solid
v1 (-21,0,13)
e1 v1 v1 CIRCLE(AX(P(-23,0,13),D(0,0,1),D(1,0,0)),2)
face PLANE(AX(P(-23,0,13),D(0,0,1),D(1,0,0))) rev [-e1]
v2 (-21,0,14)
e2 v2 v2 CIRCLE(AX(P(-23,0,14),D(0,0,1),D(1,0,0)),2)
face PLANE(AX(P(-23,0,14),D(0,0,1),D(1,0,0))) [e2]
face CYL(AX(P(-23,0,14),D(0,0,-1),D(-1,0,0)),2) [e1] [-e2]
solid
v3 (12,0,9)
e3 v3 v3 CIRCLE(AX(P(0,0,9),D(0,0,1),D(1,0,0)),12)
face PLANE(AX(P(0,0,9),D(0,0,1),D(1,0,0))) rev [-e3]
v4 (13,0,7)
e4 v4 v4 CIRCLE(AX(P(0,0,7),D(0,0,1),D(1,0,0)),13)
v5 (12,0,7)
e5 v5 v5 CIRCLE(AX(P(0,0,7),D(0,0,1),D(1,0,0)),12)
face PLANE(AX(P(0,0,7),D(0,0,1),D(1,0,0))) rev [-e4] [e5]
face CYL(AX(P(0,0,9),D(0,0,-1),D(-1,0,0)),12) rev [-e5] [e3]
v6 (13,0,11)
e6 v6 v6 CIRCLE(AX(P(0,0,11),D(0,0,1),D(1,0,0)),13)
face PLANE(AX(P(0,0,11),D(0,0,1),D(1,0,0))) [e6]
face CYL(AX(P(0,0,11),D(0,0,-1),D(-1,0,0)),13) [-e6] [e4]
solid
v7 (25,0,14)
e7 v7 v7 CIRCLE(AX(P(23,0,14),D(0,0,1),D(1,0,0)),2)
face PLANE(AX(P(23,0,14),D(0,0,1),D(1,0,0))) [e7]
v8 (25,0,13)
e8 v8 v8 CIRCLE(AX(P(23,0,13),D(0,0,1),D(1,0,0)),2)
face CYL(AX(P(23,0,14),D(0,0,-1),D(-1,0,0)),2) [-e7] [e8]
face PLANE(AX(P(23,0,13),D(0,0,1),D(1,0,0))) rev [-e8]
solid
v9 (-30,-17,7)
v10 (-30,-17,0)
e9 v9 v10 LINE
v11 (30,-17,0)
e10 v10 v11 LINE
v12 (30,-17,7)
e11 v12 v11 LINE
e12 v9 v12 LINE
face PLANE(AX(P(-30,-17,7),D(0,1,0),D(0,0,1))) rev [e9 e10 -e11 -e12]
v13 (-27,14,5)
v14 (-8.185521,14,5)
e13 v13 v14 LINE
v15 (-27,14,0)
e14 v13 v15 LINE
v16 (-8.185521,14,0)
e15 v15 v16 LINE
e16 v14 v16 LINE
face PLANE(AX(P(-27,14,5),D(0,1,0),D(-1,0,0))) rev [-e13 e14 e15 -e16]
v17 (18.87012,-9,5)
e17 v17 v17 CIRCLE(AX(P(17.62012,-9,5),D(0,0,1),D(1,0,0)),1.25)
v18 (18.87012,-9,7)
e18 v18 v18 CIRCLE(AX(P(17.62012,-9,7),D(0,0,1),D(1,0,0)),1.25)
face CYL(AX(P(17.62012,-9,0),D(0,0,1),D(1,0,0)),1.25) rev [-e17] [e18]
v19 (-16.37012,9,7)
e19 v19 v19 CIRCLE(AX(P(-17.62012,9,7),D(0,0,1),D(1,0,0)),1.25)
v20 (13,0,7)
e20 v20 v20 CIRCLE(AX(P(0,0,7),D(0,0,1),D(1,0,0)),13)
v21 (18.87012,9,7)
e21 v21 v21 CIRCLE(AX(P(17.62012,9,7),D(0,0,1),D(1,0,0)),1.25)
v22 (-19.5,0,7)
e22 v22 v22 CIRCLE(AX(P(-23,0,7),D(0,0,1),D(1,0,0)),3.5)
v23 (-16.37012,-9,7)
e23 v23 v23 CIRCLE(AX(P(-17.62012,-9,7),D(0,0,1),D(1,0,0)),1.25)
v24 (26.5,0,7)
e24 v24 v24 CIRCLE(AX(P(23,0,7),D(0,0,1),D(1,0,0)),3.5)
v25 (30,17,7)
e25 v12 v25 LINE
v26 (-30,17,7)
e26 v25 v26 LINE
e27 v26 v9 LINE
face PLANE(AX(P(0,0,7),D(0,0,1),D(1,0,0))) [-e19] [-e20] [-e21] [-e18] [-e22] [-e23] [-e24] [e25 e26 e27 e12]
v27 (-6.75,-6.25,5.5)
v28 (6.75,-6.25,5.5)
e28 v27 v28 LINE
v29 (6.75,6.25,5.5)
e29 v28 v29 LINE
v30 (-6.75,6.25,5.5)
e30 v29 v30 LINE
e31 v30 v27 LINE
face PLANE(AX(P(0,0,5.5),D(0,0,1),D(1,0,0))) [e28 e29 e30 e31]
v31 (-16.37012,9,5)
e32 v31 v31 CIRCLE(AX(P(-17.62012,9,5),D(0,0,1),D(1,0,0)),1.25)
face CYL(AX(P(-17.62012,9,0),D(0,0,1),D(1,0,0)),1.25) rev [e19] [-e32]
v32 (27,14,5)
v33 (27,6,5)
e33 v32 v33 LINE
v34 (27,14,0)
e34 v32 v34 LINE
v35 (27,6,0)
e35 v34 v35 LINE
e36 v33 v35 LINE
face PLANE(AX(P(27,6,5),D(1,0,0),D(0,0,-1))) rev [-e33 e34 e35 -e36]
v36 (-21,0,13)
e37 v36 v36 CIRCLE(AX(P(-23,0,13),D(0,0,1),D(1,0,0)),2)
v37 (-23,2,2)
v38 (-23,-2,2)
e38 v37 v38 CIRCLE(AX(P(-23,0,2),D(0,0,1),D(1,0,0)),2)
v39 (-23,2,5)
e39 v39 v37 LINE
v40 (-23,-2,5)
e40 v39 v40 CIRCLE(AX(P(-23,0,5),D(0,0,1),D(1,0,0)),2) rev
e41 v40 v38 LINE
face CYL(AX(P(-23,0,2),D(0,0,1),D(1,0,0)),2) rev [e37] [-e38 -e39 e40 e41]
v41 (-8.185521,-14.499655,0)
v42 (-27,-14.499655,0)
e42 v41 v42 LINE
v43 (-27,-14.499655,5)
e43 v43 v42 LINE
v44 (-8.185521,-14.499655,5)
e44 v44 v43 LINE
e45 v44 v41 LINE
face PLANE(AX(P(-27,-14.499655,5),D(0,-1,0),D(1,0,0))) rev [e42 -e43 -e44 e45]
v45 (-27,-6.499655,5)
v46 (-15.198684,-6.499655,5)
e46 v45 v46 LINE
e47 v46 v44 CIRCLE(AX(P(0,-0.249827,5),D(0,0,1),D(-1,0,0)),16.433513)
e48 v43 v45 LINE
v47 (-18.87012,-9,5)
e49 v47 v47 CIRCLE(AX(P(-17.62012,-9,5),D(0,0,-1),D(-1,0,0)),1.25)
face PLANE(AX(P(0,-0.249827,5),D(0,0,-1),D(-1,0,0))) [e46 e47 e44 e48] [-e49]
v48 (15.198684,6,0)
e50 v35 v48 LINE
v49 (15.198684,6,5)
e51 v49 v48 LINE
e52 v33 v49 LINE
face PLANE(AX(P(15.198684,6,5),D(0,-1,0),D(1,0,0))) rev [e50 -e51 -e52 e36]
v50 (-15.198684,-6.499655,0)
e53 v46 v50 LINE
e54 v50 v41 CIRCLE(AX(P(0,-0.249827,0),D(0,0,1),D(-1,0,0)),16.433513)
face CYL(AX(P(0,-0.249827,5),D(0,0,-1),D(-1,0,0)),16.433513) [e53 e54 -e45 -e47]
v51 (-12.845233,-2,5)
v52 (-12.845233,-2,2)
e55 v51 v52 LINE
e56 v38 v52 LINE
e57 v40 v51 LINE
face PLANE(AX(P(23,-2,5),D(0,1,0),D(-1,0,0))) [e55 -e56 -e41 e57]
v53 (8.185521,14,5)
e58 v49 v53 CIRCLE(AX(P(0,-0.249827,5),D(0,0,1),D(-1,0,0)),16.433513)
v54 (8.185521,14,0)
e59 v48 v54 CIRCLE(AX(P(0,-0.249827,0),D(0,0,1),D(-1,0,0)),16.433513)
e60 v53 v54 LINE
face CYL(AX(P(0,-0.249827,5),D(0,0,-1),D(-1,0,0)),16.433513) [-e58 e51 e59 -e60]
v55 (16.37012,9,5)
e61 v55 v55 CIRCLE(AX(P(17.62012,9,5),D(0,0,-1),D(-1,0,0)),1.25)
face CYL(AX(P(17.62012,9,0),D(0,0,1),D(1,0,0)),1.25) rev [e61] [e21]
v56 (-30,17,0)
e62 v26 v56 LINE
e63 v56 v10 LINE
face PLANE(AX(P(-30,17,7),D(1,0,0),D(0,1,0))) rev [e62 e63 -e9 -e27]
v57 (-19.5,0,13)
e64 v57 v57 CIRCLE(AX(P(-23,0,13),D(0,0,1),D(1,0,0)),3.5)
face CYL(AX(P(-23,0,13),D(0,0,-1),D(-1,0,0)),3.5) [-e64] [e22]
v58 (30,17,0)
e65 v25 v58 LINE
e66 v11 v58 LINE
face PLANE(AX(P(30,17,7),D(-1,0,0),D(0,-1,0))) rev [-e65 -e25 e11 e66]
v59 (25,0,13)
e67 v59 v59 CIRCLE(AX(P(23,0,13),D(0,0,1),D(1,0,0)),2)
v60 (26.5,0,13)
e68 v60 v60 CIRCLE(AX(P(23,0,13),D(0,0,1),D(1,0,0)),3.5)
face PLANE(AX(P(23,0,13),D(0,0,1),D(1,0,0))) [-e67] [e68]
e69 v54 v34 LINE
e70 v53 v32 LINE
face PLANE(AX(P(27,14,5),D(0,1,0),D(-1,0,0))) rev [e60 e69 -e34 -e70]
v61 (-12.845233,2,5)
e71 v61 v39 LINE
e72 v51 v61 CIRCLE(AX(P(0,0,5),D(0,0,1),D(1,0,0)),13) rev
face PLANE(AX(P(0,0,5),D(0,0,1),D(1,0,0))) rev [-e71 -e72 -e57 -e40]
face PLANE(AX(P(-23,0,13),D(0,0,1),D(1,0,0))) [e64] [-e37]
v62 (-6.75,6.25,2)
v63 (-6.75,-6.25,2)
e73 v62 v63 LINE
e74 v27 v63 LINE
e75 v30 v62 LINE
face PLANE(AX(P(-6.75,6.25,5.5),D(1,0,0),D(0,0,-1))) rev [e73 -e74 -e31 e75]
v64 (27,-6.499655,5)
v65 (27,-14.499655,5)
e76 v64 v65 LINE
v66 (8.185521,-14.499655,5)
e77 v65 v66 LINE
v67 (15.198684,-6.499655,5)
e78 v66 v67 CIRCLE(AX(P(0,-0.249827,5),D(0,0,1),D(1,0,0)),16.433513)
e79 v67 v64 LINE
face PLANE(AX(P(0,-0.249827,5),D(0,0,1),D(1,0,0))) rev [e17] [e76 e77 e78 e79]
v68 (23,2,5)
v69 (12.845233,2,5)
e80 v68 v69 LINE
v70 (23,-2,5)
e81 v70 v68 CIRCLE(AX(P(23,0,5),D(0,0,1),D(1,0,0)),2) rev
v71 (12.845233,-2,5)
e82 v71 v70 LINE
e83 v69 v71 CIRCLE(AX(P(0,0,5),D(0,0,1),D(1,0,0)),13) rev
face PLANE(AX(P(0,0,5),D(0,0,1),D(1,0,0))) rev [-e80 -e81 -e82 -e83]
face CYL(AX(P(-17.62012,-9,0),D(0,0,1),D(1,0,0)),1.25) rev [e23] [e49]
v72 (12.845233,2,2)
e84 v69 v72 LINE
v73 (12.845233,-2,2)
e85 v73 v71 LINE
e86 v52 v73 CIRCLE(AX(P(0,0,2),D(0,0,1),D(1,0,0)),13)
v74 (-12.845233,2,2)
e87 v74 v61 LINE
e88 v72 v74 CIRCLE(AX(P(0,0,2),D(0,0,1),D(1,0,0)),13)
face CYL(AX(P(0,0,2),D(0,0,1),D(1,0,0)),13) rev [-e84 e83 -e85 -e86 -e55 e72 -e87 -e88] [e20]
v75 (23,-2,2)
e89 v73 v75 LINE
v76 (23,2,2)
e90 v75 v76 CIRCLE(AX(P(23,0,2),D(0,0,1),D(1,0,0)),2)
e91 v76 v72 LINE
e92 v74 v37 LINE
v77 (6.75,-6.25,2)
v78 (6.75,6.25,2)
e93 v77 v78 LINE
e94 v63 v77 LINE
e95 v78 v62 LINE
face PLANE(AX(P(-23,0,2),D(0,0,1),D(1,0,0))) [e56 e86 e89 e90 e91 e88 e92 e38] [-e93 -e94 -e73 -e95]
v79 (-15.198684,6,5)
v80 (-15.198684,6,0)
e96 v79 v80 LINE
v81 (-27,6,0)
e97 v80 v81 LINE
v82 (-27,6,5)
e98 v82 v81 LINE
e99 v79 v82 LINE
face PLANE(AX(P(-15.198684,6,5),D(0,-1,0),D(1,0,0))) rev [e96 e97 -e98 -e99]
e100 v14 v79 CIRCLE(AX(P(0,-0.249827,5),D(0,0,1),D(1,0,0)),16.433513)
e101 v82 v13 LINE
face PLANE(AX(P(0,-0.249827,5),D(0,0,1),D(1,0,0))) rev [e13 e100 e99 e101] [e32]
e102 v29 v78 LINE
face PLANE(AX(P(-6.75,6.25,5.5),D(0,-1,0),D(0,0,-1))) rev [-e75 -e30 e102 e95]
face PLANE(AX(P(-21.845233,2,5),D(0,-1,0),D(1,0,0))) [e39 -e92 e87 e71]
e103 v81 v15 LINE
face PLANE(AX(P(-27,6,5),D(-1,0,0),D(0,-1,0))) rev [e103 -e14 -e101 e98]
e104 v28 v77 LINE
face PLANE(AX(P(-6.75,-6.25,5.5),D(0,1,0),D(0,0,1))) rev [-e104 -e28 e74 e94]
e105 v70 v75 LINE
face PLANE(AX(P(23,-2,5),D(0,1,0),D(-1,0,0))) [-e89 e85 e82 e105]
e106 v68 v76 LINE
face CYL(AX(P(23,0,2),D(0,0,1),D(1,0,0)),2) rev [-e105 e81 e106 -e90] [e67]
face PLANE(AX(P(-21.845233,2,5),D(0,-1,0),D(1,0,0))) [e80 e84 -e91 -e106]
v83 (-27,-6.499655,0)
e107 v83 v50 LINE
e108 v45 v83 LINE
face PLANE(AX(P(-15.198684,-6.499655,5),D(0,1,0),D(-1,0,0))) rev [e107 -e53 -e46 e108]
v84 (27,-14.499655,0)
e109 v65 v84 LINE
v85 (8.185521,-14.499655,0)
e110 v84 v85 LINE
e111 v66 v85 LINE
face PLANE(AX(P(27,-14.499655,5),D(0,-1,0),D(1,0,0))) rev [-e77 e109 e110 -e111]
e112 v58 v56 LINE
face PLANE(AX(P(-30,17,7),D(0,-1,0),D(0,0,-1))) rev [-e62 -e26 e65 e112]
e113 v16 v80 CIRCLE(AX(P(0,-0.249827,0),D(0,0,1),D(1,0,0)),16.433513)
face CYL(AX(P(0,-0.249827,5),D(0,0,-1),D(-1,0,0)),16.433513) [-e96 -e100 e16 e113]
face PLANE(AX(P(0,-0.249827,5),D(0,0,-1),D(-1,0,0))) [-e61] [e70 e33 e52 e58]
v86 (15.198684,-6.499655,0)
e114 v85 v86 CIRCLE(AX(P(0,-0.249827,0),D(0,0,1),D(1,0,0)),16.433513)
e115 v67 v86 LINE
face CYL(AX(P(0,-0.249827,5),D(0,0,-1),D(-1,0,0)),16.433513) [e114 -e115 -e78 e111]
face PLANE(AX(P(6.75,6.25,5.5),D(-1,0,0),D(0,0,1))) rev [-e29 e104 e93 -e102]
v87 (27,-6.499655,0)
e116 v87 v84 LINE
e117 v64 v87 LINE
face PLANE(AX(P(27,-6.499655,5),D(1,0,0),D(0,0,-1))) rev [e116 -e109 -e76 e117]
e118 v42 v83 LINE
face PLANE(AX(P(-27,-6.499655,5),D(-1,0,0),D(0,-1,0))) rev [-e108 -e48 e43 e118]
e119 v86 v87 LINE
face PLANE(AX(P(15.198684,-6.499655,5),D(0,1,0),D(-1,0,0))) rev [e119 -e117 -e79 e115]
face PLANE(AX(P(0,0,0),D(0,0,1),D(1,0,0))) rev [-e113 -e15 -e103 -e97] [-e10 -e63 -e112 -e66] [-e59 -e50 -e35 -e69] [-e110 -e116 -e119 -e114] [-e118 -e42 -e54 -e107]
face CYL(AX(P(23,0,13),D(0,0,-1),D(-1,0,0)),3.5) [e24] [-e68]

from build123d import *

# Parameters (mm, degrees)
SKETCH1_W                = 60
SKETCH1_H                = 34
BOSS_EXTRUDE1_DEPTH      = 7
SKETCH6_R                = 2
SKETCH6_R_2              = 13
CUT_EXTRUDE4_DEPTH       = 5
CUT_EXTRUDE6_DEPTH       = 3
SKETCH10_R               = 3.5
BOSS_EXTRUDE5_DEPTH      = 6
SKETCH11_R               = 2
CUT_EXTRUDE7_DEPTH       = 7
CUT_EXTRUDE8_START       = -5
CUT_EXTRUDE8_DEPTH       = 5
CUT_EXTRUDE9_DEPTH       = 36.185224172
CUT_EXTRUDE9_DEPTH_BACK  = 36.185224172
SKETCH13_R               = 1.25
CUT_EXTRUDE10_DEPTH      = 36.185224172
CUT_EXTRUDE10_DEPTH_BACK = 36.185224172
SKETCH14_R               = 1.25
CUT_EXTRUDE11_DEPTH      = 36.185224172
CUT_EXTRUDE11_DEPTH_BACK = 36.185224172
SKETCH15_R               = 1.25
CUT_EXTRUDE12_DEPTH      = 36.185224172
CUT_EXTRUDE12_DEPTH_BACK = 36.185224172
SKETCH16_R               = 1.25
SKETCH17_R               = 2
BOSS_EXTRUDE6_DEPTH      = 1
BOSS_EXTRUDE6_2_DEPTH    = 1
SKETCH18_R               = 13
BOSS_EXTRUDE7_DEPTH      = 4
SKETCH19_R               = 12
CUT_EXTRUDE13_DEPTH      = 2
SKETCH20_W               = 13.5
SKETCH20_H               = 12.5
BOSS_EXTRUDE8_DEPTH      = 3.5


# Read off the part's stored shape, not the designer's step: Cut-Extrude8
with BuildPart() as part:
    # Sketch1 → Boss-Extrude1 (new body)
    with BuildSketch(Plane.XY):
        Rectangle(SKETCH1_W, SKETCH1_H)
    extrude(amount=BOSS_EXTRUDE1_DEPTH)

    # Sketch6 → Cut-Extrude4 (cut)
    with BuildSketch(Plane.XY.offset(7)):
        with Locations((-23, 0)):
            Circle(SKETCH6_R)
        with Locations((23, 0)):
            Circle(SKETCH6_R)
        Circle(SKETCH6_R_2)
    extrude(amount=-CUT_EXTRUDE4_DEPTH, mode=Mode.SUBTRACT)

    # Sketch9 → Cut-Extrude6 (cut)
    with BuildSketch(Plane.XY.offset(2)):
        Polygon((-21.845232579, 2), (-12.845232579, 2), (12.845232579, 2), (21.845232579, 2), (23, 2), (23, 0), (23, -2), (21.845232579, -2), (12.845232579, -2), (-12.845232579, -2), (-21.845232579, -2), (-23, -2), (-23, 0), (-23, 2), align=None)
    extrude(amount=CUT_EXTRUDE6_DEPTH, mode=Mode.SUBTRACT)

    # Sketch10 → Boss-Extrude5 (add)
    with BuildSketch(Plane.XY.offset(7)):
        with Locations((23, 0)):
            Circle(SKETCH10_R)
        with Locations((-23, 0)):
            Circle(SKETCH10_R)
    extrude(amount=BOSS_EXTRUDE5_DEPTH)

    # Sketch11 → Cut-Extrude7 (cut)
    with BuildSketch(Plane.XY.offset(13)):
        with Locations((-23, 0)):
            Circle(SKETCH11_R)
        with Locations((23, 0)):
            Circle(SKETCH11_R)
    extrude(amount=-CUT_EXTRUDE7_DEPTH, mode=Mode.SUBTRACT)

    # Cut-Extrude8 outline → Cut-Extrude8 (cut)
    with BuildSketch(Plane(origin=(0, 0, 0), x_dir=(-1, 0, 0), z_dir=(0, 0, -1)).offset(CUT_EXTRUDE8_START)):
        with BuildLine():
            Line((-8.185521436, 14), (-27, 14))
            Line((-27, 14), (-27, 6))
            Line((-27, 6), (-15.198684154, 6))
            ThreePointArc((-15.198684154, 6), (-12.357397289, 10.583227318), (-8.185521436, 14))
        make_face()
        with BuildLine():
            Line((-15.198684154, -6.499654852), (-27, -6.499654852))
            Line((-27, -6.499654852), (-27, -14.499654852))
            Line((-27, -14.499654852), (-8.185521436, -14.499654852))
            ThreePointArc((-8.185521436, -14.499654852), (-12.357397289, -11.08288217), (-15.198684154, -6.499654852))
        make_face()
        with BuildLine():
            Line((27, 6), (27, 14))
            Line((27, 14), (8.185521436, 14))
            ThreePointArc((8.185521436, 14), (12.357397289, 10.583227318), (15.198684154, 6))
            Line((15.198684154, 6), (27, 6))
        make_face()
        with BuildLine():
            ThreePointArc((15.198684154, -6.499654852), (12.357397289, -11.08288217), (8.185521436, -14.499654852))
            Line((8.185521436, -14.499654852), (27, -14.499654852))
            Line((27, -14.499654852), (27, -6.499654852))
            Line((27, -6.499654852), (15.198684154, -6.499654852))
        make_face()
    extrude(amount=CUT_EXTRUDE8_DEPTH, mode=Mode.SUBTRACT)

    # Sketch13 → Cut-Extrude9 (cut, two sides: drawn at the far end of the back side and taken through both)
    with BuildSketch(Plane.XY.offset(7).offset(-CUT_EXTRUDE9_DEPTH_BACK)):
        with Locations((17.620120435, -9)):
            Circle(SKETCH13_R)
    extrude(amount=CUT_EXTRUDE9_DEPTH + CUT_EXTRUDE9_DEPTH_BACK, mode=Mode.SUBTRACT)

    # Sketch14 → Cut-Extrude10 (cut, two sides: drawn at the far end of the back side and taken through both)
    with BuildSketch(Plane.XY.offset(7).offset(-CUT_EXTRUDE10_DEPTH_BACK)):
        with Locations((17.620120435, 9)):
            Circle(SKETCH14_R)
    extrude(amount=CUT_EXTRUDE10_DEPTH + CUT_EXTRUDE10_DEPTH_BACK, mode=Mode.SUBTRACT)

    # Sketch15 → Cut-Extrude11 (cut, two sides: drawn at the far end of the back side and taken through both)
    with BuildSketch(Plane.XY.offset(7).offset(-CUT_EXTRUDE11_DEPTH_BACK)):
        with Locations((-17.620120435, -9)):
            Circle(SKETCH15_R)
    extrude(amount=CUT_EXTRUDE11_DEPTH + CUT_EXTRUDE11_DEPTH_BACK, mode=Mode.SUBTRACT)

    # Sketch16 → Cut-Extrude12 (cut, two sides: drawn at the far end of the back side and taken through both)
    with BuildSketch(Plane.XY.offset(7).offset(-CUT_EXTRUDE12_DEPTH_BACK)):
        with Locations((-17.620120435, 9)):
            Circle(SKETCH16_R)
    extrude(amount=CUT_EXTRUDE12_DEPTH + CUT_EXTRUDE12_DEPTH_BACK, mode=Mode.SUBTRACT)

    # Sketch20 → Boss-Extrude8 (add)
    with BuildSketch(Plane.XY.offset(2)):
        Rectangle(SKETCH20_W, SKETCH20_H)
    extrude(amount=BOSS_EXTRUDE8_DEPTH)


with BuildPart() as body_2:
    # Sketch17 → Boss-Extrude6 (new body)
    with BuildSketch(Plane.XY.offset(13)):
        with Locations((-23, 0)):
            Circle(SKETCH17_R)
    extrude(amount=BOSS_EXTRUDE6_DEPTH)


with BuildPart() as body_3:
    # Sketch17 → Boss-Extrude6 2 (new body)
    with BuildSketch(Plane.XY.offset(13)):
        with Locations((23, 0)):
            Circle(SKETCH17_R)
    extrude(amount=BOSS_EXTRUDE6_2_DEPTH)


with BuildPart() as body_4:
    # Sketch18 → Boss-Extrude7 (new body)
    with BuildSketch(Plane.XY.offset(7)):
        Circle(SKETCH18_R)
    extrude(amount=BOSS_EXTRUDE7_DEPTH)

    # Sketch19 → Cut-Extrude13 (cut)
    with BuildSketch(Plane.XY.offset(7)):
        Circle(SKETCH19_R)
    extrude(amount=CUT_EXTRUDE13_DEPTH, mode=Mode.SUBTRACT)


solid = Compound([part.part, body_2.part, body_3.part, body_4.part])
